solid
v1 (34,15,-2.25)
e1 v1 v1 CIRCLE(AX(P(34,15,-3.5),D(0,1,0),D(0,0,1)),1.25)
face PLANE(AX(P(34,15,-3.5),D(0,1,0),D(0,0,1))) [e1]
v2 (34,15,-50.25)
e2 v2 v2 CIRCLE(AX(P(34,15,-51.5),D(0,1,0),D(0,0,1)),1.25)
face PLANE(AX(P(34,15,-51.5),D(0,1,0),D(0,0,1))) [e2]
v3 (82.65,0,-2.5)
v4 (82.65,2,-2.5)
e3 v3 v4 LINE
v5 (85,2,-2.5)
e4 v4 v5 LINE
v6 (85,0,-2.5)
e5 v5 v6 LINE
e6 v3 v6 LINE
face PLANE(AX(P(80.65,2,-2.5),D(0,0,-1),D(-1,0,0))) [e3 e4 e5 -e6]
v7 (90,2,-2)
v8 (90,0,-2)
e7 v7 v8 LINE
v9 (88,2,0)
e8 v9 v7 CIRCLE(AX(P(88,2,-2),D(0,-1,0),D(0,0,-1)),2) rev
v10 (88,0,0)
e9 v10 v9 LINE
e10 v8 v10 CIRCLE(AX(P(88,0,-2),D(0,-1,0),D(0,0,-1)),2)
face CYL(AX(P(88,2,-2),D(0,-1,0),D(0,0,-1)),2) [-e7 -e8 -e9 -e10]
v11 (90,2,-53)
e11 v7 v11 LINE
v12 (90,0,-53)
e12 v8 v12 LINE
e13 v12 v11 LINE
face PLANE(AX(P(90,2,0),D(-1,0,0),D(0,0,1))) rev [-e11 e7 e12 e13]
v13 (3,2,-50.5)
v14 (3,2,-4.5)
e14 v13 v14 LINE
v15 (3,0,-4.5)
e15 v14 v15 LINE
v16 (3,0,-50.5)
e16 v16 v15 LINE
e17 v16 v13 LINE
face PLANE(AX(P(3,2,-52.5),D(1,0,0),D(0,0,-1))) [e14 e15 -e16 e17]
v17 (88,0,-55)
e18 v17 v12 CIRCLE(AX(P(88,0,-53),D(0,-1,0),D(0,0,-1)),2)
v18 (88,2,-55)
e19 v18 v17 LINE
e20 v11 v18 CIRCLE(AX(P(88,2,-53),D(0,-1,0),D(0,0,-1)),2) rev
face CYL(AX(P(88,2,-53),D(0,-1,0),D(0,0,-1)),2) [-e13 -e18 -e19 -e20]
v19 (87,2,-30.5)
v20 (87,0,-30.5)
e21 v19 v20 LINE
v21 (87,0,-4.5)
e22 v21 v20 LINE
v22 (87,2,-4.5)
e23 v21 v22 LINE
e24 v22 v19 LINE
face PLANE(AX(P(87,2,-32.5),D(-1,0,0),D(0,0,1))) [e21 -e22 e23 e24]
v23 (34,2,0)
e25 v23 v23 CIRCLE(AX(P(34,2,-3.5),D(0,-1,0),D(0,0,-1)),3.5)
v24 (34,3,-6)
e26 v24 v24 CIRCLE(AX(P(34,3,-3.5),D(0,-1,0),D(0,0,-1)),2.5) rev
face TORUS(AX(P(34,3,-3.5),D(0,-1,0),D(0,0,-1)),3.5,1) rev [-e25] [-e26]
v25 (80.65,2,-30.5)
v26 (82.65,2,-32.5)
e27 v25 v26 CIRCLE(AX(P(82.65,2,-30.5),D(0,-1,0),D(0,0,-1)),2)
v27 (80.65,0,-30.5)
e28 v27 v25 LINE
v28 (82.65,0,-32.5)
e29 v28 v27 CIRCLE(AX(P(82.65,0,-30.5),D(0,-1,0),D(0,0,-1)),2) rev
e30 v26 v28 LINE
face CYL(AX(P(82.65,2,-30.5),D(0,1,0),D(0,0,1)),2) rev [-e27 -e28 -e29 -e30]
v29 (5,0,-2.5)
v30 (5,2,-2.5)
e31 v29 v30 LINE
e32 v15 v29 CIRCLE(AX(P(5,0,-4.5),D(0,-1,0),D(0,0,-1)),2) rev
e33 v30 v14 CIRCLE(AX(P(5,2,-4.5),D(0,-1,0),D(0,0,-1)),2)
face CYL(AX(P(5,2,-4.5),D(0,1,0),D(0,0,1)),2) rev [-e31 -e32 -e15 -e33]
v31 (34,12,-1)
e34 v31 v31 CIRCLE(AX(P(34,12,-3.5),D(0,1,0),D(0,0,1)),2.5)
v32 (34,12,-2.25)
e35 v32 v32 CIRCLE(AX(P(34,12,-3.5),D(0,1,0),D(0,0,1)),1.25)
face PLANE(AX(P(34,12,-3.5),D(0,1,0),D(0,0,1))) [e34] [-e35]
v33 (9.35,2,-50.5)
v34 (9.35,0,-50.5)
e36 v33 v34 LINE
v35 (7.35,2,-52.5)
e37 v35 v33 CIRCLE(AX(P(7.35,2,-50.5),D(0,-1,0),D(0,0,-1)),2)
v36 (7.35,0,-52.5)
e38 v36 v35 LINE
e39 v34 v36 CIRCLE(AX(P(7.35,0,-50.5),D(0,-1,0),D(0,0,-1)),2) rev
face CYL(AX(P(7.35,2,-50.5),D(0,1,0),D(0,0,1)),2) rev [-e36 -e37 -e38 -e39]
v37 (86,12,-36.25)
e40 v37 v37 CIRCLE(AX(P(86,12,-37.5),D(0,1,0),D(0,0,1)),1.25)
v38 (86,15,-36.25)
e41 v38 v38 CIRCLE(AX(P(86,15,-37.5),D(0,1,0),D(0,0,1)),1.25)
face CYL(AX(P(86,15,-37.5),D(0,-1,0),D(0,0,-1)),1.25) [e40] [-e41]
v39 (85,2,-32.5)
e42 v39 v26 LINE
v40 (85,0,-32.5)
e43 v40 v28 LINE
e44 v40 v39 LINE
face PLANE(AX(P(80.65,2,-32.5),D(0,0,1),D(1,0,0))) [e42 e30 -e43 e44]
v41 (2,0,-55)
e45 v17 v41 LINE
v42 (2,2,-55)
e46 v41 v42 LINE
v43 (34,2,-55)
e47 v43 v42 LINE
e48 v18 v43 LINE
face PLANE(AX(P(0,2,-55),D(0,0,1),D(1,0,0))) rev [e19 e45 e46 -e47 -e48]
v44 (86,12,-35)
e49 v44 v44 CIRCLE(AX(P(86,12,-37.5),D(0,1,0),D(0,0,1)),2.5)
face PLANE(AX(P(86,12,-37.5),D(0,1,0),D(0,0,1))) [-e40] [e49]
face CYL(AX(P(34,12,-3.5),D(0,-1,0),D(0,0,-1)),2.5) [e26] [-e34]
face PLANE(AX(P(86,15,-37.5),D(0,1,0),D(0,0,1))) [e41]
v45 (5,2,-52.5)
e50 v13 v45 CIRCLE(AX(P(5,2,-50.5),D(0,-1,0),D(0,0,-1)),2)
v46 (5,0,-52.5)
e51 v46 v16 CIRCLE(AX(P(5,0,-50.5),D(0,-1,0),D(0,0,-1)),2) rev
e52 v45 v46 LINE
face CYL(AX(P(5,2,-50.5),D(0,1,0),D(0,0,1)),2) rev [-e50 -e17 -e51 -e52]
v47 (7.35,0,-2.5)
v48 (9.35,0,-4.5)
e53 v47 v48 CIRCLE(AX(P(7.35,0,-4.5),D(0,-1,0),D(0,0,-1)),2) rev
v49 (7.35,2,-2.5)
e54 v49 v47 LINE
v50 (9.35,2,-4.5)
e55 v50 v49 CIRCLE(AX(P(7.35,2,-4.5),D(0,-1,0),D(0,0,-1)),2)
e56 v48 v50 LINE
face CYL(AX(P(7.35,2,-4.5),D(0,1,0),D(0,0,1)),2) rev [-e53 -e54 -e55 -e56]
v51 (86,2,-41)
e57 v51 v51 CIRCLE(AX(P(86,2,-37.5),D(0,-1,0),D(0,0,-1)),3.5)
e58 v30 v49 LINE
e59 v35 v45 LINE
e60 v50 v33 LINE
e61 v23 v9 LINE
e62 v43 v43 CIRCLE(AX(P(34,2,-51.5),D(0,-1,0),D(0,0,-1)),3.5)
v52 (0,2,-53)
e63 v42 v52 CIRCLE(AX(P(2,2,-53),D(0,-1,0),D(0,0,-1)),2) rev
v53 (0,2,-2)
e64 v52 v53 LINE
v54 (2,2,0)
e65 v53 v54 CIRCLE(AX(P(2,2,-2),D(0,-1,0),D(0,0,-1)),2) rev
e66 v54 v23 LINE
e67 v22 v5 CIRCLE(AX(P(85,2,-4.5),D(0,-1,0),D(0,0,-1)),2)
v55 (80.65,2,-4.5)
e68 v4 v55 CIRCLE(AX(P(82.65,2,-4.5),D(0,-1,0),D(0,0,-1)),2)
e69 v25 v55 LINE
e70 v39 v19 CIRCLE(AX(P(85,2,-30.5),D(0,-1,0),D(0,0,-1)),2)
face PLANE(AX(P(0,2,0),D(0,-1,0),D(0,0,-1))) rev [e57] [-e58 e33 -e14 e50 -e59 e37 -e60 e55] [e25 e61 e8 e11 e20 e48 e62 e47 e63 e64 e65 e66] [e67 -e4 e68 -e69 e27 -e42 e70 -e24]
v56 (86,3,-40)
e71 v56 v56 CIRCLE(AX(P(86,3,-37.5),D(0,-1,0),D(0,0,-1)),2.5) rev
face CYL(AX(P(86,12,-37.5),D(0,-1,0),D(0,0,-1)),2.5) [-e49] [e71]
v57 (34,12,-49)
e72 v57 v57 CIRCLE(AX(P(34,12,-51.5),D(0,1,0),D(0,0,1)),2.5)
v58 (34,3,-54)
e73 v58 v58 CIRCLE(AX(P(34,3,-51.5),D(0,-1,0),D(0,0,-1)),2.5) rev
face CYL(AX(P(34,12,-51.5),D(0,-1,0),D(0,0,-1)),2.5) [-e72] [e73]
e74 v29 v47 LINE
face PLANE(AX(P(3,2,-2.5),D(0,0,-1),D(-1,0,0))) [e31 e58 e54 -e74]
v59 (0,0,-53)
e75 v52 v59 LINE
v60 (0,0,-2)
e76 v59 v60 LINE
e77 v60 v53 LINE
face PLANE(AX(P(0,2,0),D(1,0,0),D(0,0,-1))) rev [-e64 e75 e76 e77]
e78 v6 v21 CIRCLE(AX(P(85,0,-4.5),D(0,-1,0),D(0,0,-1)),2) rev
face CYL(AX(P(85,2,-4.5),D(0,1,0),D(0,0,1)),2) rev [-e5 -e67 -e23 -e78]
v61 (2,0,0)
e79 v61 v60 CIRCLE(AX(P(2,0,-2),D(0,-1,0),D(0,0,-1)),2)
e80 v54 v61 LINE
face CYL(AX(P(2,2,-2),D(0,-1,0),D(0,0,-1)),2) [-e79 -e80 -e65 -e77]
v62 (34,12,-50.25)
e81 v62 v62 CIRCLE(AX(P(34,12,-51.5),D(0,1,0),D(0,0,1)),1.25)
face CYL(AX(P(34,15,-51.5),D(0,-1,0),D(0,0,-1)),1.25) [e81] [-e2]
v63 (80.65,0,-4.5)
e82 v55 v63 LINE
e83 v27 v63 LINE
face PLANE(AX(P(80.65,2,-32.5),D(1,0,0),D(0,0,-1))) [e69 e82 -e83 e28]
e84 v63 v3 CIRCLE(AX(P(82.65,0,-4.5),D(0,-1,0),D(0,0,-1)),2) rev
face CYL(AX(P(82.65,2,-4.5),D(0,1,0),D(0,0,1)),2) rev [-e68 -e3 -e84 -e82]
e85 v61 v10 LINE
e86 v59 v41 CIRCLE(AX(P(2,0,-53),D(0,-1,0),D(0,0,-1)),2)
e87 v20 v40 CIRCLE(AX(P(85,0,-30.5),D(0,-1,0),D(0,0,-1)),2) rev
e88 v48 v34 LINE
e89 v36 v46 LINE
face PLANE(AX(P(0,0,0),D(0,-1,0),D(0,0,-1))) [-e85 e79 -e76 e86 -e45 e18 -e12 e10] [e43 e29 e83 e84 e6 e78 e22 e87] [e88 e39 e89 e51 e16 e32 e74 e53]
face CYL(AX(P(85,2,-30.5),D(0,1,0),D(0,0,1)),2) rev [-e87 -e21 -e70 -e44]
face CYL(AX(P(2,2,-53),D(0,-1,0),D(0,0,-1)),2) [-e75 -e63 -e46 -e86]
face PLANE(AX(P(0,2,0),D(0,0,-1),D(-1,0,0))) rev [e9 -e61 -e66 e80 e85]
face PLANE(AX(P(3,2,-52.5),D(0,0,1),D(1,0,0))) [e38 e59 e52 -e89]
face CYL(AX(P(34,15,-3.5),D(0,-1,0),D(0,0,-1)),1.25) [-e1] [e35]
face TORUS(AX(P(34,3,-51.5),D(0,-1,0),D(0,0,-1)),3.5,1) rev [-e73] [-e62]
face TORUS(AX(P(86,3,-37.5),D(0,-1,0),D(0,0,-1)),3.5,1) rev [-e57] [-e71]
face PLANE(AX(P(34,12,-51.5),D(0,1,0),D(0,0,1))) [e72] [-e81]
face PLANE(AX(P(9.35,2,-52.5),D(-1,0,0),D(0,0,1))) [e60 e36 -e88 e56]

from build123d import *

# Parameters (mm, degrees)
SKETCH1_W           = 90
SKETCH1_H           = 55
SKETCH1_W_2         = 6.35
SKETCH1_H_2         = 30
SKETCH1_H_3         = 50
BOSS_EXTRUDE1_DEPTH = 2
SKETCH2_R           = 2.5
BOSS_EXTRUDE2_DEPTH = 10
SKETCH3_R           = 1.25
BOSS_EXTRUDE3_DEPTH = 3
FILLET1_R           = 2
FILLET2_R           = 1


with BuildPart() as part:
    # Sketch1 → Boss-Extrude1 (new body)
    with BuildSketch(Plane(origin=(0, 0, 0), x_dir=(1, 0, 0), z_dir=(0, 1, 0))):
        with Locations((45, 27.5)):
            Rectangle(SKETCH1_W, SKETCH1_H)
        with Locations((83.825, 17.5)):
            Rectangle(SKETCH1_W_2, SKETCH1_H_2, mode=Mode.SUBTRACT)
        with Locations((6.175, 27.5)):
            Rectangle(SKETCH1_W_2, SKETCH1_H_3, mode=Mode.SUBTRACT)
    extrude(amount=BOSS_EXTRUDE1_DEPTH)

    # Sketch2 → Boss-Extrude2 (add)
    with BuildSketch(Plane(origin=(0, 2, 0), x_dir=(1, 0, 0), z_dir=(0, 1, 0))):
        with Locations(Location((34, 51.5, 0), (0, 0, 90))):
            Circle(SKETCH2_R)
        with Locations(Location((34, 3.5, 0), (0, 0, 90))):
            Circle(SKETCH2_R)
        with Locations(Location((86, 37.5, 0), (0, 0, 90))):
            Circle(SKETCH2_R)
    extrude(amount=BOSS_EXTRUDE2_DEPTH)

    # Sketch3 → Boss-Extrude3 (add)
    with BuildSketch(Plane(origin=(0, 12, 0), x_dir=(1, 0, 0), z_dir=(0, 1, 0))):
        with Locations(Location((34, 51.5, 0), (0, 0, 270))):
            Circle(SKETCH3_R)
        with Locations(Location((34, 3.5, 0), (0, 0, 270))):
            Circle(SKETCH3_R)
        with Locations(Location((86, 37.5, 0), (0, 0, 270))):
            Circle(SKETCH3_R)
    extrude(amount=BOSS_EXTRUDE3_DEPTH)

    # Fillet1
    fillet1_edges = [part.edges().sort_by_distance(p)[0] for p in [
        (80.65, 1, -32.5),
        (80.65, 1, -2.5),
        (87, 1, -2.5),
        (87, 1, -32.5),
        (3, 1, -52.5),
        (3, 1, -2.5),
        (9.35, 1, -2.5),
        (9.35, 1, -52.5),
        (0, 1, -55),
        (90, 1, -55),
        (90, 1, 0),
        (0, 1, 0),
    ]]
    fillet(fillet1_edges, radius=FILLET1_R)

    # Fillet2
    fillet2_edges = [part.edges().sort_by_distance(p)[0] for p in [
        (86, 2, -35),
        (34, 2, -1),
        (34, 2, -49),
    ]]
    fillet(fillet2_edges, radius=FILLET2_R - 0.0001)  # a hair under: the kernel refuses the full size


solid = part.part
